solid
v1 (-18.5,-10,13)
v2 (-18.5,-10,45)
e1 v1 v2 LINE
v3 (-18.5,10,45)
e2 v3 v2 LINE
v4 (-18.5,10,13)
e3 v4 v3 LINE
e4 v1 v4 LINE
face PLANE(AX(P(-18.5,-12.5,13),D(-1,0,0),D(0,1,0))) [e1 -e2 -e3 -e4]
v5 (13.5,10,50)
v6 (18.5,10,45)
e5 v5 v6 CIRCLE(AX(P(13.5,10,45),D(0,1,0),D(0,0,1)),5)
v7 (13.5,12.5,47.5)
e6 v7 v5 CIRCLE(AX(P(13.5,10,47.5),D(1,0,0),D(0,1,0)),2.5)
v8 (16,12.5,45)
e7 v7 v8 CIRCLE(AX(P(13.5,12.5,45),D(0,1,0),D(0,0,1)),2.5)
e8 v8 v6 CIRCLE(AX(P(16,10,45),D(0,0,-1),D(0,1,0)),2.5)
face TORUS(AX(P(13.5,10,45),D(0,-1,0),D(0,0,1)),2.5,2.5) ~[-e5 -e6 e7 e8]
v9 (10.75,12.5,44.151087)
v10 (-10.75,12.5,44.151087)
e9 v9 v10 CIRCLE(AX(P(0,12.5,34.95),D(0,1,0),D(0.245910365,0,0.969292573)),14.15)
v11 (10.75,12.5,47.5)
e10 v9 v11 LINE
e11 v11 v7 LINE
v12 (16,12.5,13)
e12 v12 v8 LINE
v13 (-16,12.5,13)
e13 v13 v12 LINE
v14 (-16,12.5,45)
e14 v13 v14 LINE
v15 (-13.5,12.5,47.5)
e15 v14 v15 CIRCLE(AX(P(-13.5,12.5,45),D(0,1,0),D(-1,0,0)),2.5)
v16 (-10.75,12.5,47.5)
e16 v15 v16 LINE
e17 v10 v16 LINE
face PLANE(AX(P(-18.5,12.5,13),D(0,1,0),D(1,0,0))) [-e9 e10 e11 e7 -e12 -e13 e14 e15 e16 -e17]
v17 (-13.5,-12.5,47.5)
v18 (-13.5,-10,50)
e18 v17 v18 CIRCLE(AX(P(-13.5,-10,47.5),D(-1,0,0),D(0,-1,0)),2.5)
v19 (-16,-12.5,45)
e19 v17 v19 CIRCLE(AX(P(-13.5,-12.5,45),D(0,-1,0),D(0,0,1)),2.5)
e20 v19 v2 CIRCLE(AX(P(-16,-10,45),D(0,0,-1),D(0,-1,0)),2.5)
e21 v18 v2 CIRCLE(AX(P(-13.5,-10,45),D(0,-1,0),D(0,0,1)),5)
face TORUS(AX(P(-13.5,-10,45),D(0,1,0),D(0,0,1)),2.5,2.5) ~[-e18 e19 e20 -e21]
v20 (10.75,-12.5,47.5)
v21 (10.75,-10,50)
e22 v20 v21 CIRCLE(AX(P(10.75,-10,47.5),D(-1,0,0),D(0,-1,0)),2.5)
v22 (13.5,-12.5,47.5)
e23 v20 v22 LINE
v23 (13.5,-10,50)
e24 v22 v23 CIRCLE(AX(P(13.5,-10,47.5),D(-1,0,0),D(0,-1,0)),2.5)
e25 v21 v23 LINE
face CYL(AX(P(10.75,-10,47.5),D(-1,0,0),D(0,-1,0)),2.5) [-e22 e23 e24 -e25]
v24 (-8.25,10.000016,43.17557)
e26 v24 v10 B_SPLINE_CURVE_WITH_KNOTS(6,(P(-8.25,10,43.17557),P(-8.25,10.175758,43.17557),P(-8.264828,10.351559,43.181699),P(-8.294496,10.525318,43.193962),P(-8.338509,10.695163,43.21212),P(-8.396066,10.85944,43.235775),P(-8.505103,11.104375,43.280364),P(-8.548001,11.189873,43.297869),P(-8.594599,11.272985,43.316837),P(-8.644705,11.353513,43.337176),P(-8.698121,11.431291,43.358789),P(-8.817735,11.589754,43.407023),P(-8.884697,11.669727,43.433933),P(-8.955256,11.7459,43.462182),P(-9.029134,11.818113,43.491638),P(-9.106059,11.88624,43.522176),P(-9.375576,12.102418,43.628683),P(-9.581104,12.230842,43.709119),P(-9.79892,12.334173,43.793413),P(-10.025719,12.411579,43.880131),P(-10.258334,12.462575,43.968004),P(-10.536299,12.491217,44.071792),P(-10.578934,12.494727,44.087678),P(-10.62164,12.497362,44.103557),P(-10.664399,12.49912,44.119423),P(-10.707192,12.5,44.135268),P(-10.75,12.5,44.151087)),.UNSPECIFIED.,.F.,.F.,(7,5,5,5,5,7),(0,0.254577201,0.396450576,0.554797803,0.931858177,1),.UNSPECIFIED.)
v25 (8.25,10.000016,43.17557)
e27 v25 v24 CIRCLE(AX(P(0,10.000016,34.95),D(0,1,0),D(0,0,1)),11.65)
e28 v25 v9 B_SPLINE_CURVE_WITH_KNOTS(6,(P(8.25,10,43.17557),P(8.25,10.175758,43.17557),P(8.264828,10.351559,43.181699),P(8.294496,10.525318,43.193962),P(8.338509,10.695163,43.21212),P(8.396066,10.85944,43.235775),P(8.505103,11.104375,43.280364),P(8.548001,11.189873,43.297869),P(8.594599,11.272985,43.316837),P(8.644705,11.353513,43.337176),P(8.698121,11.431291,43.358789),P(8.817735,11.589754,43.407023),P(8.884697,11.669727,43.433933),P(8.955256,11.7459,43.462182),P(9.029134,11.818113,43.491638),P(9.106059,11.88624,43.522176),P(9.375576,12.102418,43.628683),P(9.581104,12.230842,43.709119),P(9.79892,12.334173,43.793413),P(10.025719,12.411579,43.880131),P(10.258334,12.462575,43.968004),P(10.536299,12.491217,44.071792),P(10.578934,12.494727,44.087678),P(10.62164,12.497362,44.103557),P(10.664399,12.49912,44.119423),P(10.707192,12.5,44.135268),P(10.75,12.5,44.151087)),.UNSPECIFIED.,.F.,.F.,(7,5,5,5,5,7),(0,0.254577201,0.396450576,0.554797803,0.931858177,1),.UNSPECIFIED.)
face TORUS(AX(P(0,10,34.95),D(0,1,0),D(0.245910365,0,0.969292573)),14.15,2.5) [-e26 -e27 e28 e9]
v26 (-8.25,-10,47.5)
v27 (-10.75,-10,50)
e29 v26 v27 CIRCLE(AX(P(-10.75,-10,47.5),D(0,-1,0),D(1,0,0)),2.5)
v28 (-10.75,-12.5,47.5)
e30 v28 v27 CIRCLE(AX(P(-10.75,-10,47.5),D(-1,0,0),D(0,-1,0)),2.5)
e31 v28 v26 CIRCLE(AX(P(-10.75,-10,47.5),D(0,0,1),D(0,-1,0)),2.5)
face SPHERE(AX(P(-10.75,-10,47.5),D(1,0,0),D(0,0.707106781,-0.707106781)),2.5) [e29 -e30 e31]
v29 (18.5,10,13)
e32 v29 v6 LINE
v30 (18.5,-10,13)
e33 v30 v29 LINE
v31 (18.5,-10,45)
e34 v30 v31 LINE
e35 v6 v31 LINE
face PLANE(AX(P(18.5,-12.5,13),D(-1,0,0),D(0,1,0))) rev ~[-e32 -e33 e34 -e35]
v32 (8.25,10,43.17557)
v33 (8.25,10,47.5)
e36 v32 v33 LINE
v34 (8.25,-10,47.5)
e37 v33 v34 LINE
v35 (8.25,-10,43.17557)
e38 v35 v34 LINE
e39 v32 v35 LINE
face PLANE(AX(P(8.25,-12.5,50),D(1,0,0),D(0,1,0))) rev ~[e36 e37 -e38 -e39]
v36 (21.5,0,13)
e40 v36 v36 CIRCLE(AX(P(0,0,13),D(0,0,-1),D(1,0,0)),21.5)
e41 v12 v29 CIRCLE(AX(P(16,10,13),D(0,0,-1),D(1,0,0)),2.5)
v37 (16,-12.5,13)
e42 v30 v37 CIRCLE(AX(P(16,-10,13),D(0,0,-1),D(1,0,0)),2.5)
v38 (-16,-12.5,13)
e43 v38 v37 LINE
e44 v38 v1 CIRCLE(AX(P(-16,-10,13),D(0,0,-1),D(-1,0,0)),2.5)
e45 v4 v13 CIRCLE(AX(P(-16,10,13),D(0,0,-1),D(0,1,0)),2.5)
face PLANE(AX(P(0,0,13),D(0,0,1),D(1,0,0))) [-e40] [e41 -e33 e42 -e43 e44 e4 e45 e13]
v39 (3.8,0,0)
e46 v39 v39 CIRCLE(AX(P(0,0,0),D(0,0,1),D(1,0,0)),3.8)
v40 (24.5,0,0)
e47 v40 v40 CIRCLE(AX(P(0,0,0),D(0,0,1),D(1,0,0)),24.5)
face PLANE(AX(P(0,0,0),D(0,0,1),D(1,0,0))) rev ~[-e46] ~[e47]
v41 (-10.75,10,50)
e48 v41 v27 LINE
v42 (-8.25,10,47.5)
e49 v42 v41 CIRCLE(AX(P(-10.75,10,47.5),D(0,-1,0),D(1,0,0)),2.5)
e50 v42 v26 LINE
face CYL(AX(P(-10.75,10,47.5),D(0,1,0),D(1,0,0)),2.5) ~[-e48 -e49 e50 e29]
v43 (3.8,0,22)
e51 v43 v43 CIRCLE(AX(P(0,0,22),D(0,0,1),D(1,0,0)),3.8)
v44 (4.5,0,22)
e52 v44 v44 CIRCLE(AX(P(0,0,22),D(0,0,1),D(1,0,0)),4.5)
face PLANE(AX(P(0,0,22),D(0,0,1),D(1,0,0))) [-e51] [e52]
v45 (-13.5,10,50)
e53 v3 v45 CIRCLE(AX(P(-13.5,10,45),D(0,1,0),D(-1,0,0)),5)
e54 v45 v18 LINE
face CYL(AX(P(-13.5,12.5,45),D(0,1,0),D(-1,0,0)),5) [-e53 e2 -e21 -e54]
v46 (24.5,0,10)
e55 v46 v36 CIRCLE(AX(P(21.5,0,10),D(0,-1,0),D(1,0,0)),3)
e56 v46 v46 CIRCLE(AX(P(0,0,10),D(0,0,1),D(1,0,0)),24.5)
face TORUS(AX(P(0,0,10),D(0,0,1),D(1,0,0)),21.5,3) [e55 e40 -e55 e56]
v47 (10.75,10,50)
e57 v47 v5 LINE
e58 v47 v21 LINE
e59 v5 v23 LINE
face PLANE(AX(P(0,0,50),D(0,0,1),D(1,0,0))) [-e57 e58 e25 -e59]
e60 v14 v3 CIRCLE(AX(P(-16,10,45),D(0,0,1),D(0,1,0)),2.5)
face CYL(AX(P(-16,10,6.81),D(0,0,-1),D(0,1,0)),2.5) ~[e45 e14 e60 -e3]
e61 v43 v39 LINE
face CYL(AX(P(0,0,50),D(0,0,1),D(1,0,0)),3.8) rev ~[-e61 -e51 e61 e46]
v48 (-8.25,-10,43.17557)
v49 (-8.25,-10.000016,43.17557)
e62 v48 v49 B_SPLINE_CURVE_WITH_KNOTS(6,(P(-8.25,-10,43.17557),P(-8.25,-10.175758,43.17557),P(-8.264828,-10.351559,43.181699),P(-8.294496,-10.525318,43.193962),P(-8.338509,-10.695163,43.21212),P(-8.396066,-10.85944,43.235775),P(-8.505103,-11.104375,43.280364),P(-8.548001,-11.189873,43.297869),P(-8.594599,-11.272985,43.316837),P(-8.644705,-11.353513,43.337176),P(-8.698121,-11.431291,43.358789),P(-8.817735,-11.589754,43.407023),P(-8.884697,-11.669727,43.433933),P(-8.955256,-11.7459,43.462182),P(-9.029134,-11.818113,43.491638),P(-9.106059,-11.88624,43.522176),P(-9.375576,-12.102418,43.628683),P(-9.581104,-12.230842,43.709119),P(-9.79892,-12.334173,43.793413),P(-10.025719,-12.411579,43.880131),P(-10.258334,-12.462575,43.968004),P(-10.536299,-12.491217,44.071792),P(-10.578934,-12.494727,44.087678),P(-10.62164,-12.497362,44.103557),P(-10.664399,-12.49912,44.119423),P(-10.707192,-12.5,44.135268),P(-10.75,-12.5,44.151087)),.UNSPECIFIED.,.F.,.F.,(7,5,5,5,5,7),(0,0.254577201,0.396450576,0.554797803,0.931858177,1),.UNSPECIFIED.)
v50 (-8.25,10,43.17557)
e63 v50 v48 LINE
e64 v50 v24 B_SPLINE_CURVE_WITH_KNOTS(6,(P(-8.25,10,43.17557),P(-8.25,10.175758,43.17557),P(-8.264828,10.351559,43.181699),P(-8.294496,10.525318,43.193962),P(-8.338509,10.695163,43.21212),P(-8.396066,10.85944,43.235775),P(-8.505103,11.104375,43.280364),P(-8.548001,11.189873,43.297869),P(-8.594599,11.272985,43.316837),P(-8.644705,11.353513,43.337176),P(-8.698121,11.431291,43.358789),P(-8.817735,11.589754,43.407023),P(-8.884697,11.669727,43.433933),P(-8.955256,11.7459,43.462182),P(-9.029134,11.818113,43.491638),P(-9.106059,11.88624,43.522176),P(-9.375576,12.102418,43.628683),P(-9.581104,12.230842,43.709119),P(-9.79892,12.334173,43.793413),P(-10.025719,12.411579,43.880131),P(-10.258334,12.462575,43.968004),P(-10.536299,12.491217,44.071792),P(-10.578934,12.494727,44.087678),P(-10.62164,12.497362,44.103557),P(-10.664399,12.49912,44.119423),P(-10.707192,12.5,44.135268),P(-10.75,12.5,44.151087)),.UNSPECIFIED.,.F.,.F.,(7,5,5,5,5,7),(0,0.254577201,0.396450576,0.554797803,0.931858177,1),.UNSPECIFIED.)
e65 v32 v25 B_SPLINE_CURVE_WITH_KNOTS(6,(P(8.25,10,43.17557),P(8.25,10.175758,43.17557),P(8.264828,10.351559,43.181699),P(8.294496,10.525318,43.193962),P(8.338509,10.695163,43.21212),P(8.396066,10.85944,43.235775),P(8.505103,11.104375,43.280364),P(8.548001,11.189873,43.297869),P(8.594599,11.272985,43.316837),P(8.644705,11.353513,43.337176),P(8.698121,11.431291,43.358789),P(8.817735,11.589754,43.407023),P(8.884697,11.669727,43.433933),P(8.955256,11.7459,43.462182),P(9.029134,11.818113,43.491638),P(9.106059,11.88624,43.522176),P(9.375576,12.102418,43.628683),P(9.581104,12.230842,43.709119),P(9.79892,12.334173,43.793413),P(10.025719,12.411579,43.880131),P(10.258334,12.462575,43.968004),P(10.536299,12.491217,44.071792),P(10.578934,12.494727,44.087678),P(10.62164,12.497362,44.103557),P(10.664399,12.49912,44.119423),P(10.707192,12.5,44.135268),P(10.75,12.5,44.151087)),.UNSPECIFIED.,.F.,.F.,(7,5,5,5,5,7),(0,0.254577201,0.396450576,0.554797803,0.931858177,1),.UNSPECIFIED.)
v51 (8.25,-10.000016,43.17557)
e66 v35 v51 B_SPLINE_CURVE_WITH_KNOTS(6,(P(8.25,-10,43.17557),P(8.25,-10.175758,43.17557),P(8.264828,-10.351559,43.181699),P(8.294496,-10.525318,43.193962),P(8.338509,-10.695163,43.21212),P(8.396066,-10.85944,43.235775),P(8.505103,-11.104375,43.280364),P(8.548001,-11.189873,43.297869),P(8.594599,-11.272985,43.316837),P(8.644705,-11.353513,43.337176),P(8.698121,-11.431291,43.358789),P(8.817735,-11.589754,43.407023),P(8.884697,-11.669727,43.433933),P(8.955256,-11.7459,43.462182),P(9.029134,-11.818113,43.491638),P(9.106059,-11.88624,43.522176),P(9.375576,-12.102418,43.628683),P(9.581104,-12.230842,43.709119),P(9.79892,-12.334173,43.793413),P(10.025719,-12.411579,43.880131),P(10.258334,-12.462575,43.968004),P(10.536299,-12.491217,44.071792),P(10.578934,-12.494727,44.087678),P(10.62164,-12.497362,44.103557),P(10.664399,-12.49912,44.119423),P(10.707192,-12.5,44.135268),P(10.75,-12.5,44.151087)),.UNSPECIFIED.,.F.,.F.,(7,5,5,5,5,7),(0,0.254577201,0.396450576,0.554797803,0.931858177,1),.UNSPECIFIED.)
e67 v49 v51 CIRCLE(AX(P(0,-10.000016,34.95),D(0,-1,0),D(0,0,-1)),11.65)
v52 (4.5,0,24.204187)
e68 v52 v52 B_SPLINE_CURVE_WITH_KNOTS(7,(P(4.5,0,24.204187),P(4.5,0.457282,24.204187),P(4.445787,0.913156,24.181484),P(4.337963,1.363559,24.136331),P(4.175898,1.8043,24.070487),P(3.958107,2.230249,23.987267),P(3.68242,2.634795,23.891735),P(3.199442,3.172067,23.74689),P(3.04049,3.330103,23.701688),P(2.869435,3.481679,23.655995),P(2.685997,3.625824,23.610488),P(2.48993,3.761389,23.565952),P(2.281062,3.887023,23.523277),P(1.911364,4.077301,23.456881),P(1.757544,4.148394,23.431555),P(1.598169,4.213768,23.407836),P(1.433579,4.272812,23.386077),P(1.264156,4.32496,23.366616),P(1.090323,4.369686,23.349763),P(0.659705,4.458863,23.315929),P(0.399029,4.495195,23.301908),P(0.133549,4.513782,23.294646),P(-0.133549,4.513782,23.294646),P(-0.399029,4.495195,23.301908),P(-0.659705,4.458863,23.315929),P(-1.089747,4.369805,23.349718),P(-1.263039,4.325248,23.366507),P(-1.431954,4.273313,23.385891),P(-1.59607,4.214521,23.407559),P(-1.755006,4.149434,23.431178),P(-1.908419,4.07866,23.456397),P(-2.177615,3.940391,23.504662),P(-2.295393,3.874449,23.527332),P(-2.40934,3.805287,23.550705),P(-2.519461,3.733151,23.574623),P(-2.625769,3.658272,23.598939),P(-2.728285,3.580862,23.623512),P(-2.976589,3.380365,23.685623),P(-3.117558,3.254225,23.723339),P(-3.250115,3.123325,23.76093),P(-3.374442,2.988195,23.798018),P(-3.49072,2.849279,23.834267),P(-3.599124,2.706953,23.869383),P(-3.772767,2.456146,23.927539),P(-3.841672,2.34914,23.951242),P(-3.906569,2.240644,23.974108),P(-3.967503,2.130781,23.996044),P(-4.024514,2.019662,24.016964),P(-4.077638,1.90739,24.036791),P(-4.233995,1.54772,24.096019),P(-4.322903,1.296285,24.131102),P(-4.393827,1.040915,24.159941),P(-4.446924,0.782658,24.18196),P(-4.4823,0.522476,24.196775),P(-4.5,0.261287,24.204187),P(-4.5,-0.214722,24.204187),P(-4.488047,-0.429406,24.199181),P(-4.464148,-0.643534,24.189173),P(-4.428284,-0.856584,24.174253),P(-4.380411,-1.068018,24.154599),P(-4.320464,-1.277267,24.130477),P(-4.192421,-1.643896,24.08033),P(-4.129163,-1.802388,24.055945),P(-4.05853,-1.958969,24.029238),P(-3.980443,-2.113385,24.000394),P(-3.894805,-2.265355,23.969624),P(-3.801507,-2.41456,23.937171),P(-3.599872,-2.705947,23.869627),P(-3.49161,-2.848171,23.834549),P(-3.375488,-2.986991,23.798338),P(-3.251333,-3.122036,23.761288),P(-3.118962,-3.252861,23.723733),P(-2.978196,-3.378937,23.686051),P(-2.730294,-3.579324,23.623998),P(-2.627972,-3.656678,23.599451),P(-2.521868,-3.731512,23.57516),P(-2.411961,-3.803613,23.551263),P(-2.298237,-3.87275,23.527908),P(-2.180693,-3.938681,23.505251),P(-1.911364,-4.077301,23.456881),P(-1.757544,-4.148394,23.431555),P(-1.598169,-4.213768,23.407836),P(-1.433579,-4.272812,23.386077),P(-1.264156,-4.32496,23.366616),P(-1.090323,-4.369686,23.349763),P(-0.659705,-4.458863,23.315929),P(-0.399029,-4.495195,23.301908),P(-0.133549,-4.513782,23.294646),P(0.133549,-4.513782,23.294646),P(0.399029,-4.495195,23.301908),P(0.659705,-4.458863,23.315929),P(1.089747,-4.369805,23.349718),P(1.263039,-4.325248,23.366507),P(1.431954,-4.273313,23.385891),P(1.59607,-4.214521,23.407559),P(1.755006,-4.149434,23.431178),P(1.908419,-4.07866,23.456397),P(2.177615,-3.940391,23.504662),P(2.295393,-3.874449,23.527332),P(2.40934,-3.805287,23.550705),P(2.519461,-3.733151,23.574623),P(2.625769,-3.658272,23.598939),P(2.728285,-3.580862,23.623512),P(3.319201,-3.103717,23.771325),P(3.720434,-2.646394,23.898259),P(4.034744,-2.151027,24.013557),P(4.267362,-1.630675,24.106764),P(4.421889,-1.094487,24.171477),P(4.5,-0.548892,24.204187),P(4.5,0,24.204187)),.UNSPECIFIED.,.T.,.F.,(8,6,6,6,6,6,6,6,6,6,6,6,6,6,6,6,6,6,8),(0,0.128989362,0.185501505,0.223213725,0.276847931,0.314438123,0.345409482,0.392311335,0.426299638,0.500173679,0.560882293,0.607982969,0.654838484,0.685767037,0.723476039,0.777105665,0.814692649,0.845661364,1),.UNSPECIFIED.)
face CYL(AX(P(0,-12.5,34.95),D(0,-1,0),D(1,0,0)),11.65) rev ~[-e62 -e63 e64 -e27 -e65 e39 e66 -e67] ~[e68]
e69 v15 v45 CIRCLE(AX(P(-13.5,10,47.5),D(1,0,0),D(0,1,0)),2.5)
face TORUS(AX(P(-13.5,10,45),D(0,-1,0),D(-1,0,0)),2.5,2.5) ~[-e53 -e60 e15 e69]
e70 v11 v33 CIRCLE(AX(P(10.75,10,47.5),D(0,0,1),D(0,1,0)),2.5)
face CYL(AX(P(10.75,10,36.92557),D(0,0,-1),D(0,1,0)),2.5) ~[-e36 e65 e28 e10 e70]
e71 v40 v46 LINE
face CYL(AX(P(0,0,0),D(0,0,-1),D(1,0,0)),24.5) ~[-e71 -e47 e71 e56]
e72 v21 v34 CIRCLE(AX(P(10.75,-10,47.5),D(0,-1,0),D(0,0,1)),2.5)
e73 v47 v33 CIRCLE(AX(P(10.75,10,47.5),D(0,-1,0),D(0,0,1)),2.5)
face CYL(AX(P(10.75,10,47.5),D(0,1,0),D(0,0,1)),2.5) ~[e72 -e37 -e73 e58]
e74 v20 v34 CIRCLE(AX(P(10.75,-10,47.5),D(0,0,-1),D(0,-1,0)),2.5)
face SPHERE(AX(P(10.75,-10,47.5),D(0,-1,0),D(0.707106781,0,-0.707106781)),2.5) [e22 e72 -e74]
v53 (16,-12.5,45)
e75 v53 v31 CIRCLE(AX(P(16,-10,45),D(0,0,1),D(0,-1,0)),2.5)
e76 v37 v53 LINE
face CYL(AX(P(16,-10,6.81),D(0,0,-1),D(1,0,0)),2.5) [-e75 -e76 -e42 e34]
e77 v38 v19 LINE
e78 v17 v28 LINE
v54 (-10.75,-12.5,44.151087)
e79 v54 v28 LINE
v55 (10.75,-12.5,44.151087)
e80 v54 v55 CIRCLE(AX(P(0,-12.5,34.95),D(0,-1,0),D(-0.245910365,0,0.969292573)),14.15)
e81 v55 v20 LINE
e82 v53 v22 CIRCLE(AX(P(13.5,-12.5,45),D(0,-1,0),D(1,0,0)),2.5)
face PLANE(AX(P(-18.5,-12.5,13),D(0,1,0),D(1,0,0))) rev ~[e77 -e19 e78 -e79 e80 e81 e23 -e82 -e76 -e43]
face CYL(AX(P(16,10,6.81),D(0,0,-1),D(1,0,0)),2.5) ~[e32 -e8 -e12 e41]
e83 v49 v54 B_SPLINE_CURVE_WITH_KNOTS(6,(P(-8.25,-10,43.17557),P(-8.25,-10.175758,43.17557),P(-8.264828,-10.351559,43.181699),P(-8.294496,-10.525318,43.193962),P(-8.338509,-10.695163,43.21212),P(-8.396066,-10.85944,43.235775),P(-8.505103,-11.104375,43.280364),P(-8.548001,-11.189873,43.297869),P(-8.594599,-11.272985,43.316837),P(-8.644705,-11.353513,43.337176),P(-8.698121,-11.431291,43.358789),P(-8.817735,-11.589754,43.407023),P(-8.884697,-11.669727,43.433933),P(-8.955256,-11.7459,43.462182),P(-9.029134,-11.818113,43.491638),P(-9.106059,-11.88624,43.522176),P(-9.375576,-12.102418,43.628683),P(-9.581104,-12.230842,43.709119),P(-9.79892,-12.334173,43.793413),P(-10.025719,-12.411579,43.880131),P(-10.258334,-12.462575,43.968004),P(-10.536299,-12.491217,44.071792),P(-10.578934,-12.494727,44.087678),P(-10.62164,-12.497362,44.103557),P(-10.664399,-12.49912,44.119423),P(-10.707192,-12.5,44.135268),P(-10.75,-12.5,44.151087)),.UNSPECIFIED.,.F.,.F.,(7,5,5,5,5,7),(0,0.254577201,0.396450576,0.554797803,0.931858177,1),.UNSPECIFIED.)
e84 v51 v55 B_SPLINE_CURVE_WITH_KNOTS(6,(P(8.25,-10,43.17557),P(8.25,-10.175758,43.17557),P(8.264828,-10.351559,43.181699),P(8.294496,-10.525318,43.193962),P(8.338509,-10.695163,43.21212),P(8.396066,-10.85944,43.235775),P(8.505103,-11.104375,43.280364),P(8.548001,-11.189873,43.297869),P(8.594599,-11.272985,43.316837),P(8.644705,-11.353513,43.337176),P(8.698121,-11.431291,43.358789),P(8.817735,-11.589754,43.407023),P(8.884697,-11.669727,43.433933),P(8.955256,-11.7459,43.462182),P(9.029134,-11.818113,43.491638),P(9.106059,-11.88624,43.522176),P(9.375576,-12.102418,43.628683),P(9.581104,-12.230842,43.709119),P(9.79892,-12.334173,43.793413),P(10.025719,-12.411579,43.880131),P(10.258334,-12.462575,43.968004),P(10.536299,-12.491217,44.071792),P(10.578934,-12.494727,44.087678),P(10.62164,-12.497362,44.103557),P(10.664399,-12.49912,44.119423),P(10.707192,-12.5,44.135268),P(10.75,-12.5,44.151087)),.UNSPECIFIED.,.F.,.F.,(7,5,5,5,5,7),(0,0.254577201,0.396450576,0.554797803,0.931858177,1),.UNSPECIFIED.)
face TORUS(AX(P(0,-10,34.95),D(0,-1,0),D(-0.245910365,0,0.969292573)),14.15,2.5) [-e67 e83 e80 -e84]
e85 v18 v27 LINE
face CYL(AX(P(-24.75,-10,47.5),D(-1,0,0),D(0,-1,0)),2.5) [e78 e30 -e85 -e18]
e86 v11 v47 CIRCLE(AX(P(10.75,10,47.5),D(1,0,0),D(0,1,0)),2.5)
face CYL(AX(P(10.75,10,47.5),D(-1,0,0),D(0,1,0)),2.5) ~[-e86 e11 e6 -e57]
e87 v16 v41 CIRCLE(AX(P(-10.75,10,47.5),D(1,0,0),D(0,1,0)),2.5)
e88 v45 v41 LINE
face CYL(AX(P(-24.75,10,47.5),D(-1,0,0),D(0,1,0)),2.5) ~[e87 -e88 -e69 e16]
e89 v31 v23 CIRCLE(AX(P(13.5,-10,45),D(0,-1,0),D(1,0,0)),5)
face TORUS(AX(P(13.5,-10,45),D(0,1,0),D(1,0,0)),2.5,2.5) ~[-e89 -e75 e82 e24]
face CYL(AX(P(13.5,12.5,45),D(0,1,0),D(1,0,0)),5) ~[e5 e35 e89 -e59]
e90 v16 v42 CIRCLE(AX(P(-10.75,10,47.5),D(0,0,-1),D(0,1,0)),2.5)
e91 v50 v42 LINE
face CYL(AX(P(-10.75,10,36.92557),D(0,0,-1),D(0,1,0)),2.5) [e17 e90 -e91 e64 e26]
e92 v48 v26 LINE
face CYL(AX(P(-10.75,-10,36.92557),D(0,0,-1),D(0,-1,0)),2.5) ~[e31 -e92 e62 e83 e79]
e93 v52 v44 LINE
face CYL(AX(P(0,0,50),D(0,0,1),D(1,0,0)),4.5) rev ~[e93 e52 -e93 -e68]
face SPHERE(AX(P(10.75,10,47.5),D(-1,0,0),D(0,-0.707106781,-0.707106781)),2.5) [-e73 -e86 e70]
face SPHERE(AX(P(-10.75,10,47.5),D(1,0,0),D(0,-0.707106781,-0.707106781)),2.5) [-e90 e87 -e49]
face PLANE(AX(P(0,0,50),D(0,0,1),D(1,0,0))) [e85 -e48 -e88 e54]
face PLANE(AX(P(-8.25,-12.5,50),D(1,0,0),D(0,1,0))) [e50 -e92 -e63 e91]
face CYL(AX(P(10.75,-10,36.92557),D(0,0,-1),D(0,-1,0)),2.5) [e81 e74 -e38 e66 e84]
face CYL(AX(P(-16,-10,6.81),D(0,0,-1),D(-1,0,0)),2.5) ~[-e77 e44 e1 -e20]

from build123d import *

# Parameters (mm, degrees)
F0_R          = 24.5
F1_DEPTH      = 13
F2_W          = 37
F2_H          = 25
F3_DEPTH      = 37
F5_R          = 3.8
F6_DEPTH      = 60
F7_R          = 11.65
F8_DEPTH      = 40
F9_W          = 16.5
F9_H          = 25
F10_DEPTH     = 10
F11_R         = 4.5
F12_DEPTH     = 28
F13_T1_DEPTH  = 14
F13_T3_DEPTH  = 14
F13_T5_DEPTH  = 10.5744301109
F13_T7_DEPTH  = 20
F13_S11_W     = 2.5
F13_S11_H     = 2.5
F13_T12_DEPTH = 2.5
F13_S17_W     = 2.5
F13_S17_H     = 2.5
F13_T18_DEPTH = 2.5
F13_S23_W     = 2.5
F13_S23_H     = 2.5
F13_T24_DEPTH = 2.5
F13_S29_W     = 2.5
F13_S29_H     = 2.5
F13_T30_DEPTH = 2.5
F13_T36_DEPTH = 49.44
F13_T41_DEPTH = 49.44
F13_T46_DEPTH = 49.44
F13_T51_DEPTH = 49.44
F13_T54_ANGLE = 331.528720339
F13_T56_ANGLE = 331.528720339
F14_T1_DEPTH  = 24.9999999998
F14_T4_ANGLE  = 90
F14_T6_ANGLE  = 90
F14_T8_ANGLE  = 90
F14_T10_ANGLE = 90


# Not quite as in the source:
# - a fillet or chamfer that OpenCascade refuses, or shapes differently, is made with other operations: its cross-section is extruded or revolved along the edge and cut away or added


with BuildPart() as f1:
    # F0 (on Top) → F1 (new body)
    with BuildSketch(Plane.XY):
        Circle(F0_R)
    extrude(amount=F1_DEPTH)

    # F2 (on face) → F3 (join)
    with BuildSketch(Plane.XY.offset(13)):
        Rectangle(F2_W, F2_H)
    extrude(amount=F3_DEPTH)

    # F4: fillet of radius 3 on 1 edges, made by hand

    # F4_s1 → F4_t2 (revolve, cut)
    with BuildSketch(Plane.XZ):
        with BuildLine():
            ThreePointArc((24.5, 10), (23.6213203436, 12.1213203436), (21.5, 13))
            Line((21.5, 13), (21.5, 13.06))
            Line((21.5, 13.06), (24.56, 13.06))
            Line((24.56, 13.06), (24.56, 10))
            Line((24.56, 10), (24.5, 10))
        make_face()
    revolve(axis=Axis((0, 0, 13), (0, 0, 1)), mode=Mode.SUBTRACT)

    # F5 (on face) → F6 (cut)
    with BuildSketch(Plane.XY.offset(50)):
        Circle(F5_R)
    extrude(amount=-F6_DEPTH, mode=Mode.SUBTRACT)

    # F7 (on face) → F8 (cut)
    with BuildSketch(Plane.XZ.offset(12.5)):
        with Locations((0, 34.95)):
            Circle(F7_R)
    extrude(amount=-F8_DEPTH, mode=Mode.SUBTRACT)

    # F9 (on face) → F10 (cut)
    with BuildSketch(Plane.XY.offset(50)):
        Rectangle(F9_W, F9_H)
    extrude(amount=-F10_DEPTH, mode=Mode.SUBTRACT)

    # F11 (on face) → F12 (cut)
    with BuildSketch(Plane.XY.offset(50)):
        Circle(F11_R)
    extrude(amount=-F12_DEPTH, mode=Mode.SUBTRACT)

    # F13: fillet of radius 2.5 on 16 edges, made by hand

    # F13_s2 → F13_t1 (cut)
    with BuildSketch(Plane.YZ.offset(-24.75)):
        with BuildLine():
            ThreePointArc((-12.5, 47.5), (-11.767766953, 49.267766953), (-10, 50))
            Line((-10, 50), (-12.5, 50))
            Line((-12.5, 50), (-12.5, 47.5))
        make_face()
        with BuildLine():
            ThreePointArc((12.5, 47.5), (11.767766953, 49.267766953), (10, 50))
            Line((10, 50), (12.5, 50))
            Line((12.5, 50), (12.5, 47.5))
        make_face()
    extrude(amount=F13_T1_DEPTH, mode=Mode.SUBTRACT)

    # F13_s4 → F13_t3 (cut)
    with BuildSketch(Plane.YZ.offset(10.75)):
        with BuildLine():
            ThreePointArc((-12.5, 47.5), (-11.767766953, 49.267766953), (-10, 50))
            Line((-10, 50), (-12.5, 50))
            Line((-12.5, 50), (-12.5, 47.5))
        make_face()
        with BuildLine():
            ThreePointArc((12.5, 47.5), (11.767766953, 49.267766953), (10, 50))
            Line((10, 50), (12.5, 50))
            Line((12.5, 50), (12.5, 47.5))
        make_face()
    extrude(amount=F13_T3_DEPTH, mode=Mode.SUBTRACT)

    # F13_s6 → F13_t5 (cut)
    with BuildSketch(Plane.XY.offset(36.9255698891)):
        with BuildLine():
            ThreePointArc((-10.75, -12.5), (-8.982233047, -11.767766953), (-8.25, -10))
            Line((-8.25, -10), (-8.25, -12.5))
            Line((-8.25, -12.5), (-10.75, -12.5))
        make_face()
        with BuildLine():
            ThreePointArc((10.75, -12.5), (8.982233047, -11.767766953), (8.25, -10))
            Line((8.25, -10), (8.25, -12.5))
            Line((8.25, -12.5), (10.75, -12.5))
        make_face()
        with BuildLine():
            ThreePointArc((10.75, 12.5), (8.982233047, 11.767766953), (8.25, 10))
            Line((8.25, 10), (8.25, 12.5))
            Line((8.25, 12.5), (10.75, 12.5))
        make_face()
        with BuildLine():
            ThreePointArc((-10.75, 12.5), (-8.982233047, 11.767766953), (-8.25, 10))
            Line((-8.25, 10), (-8.25, 12.5))
            Line((-8.25, 12.5), (-10.75, 12.5))
        make_face()
    extrude(amount=F13_T5_DEPTH, mode=Mode.SUBTRACT)

    # F13_s8 → F13_t7 (cut)
    with BuildSketch(Plane.XZ.offset(-10)):
        with BuildLine():
            ThreePointArc((10.75, 50), (8.982233047, 49.267766953), (8.25, 47.5))
            Line((8.25, 47.5), (8.25, 50))
            Line((8.25, 50), (10.75, 50))
        make_face()
        with BuildLine():
            ThreePointArc((-8.25, 47.5), (-8.982233047, 49.267766953), (-10.75, 50))
            Line((-10.75, 50), (-8.25, 50))
            Line((-8.25, 50), (-8.25, 47.5))
        make_face()
    extrude(amount=F13_T7_DEPTH, mode=Mode.SUBTRACT)


with BuildPart() as f13_tool10:
    # F13_s11 → F13_t12 (new body)
    with BuildSketch(Plane.YZ.offset(-10.75)):
        with Locations((-11.25, 48.75)):
            Rectangle(F13_S11_W, F13_S11_H)
    extrude(amount=F13_T12_DEPTH)

    # F13_s13 → F13_t14 (revolve, cut)
    with BuildSketch(Plane(origin=(-10.75, -10, 47.5), x_dir=(0, 0.7071067812, -0.7071067812), z_dir=(0, -0.7071067812, -0.7071067812))):
        with BuildLine():
            ThreePointArc((0, -2.5), (2.5, 0), (0, 2.5))
            Line((0, 2.5), (0, -2.5))
        make_face()
    revolve(axis=Axis((-10.75, -10, 47.5), (1, 0, 0)), mode=Mode.SUBTRACT)


with BuildPart() as f1_1:
    add(f1.part)

    # F13_t9: cut F13_tool10
    add(f13_tool10.part, mode=Mode.SUBTRACT)


with BuildPart() as f13_tool16:
    # F13_s17 → F13_t18 (new body)
    with BuildSketch(Plane.XZ.offset(10)):
        with Locations((9.5, 48.75)):
            Rectangle(F13_S17_W, F13_S17_H)
    extrude(amount=F13_T18_DEPTH)

    # F13_s19 → F13_t20 (revolve, cut)
    with BuildSketch(Plane(origin=(10.75, -10, 47.5), x_dir=(0.7071067812, 0, -0.7071067812), z_dir=(-0.7071067812, 0, -0.7071067812))):
        with BuildLine():
            ThreePointArc((0, -2.5), (2.5, 0), (0, 2.5))
            Line((0, 2.5), (0, -2.5))
        make_face()
    revolve(axis=Axis((10.75, -10, 47.5), (0, -1, 0)), mode=Mode.SUBTRACT)


with BuildPart() as f1_2:
    add(f1_1.part)

    # F13_t15: cut F13_tool16
    add(f13_tool16.part, mode=Mode.SUBTRACT)


with BuildPart() as f13_tool22:
    # F13_s23 → F13_t24 (new body)
    with BuildSketch(Plane.YZ.offset(-10.75)):
        with Locations((11.25, 48.75)):
            Rectangle(F13_S23_W, F13_S23_H)
    extrude(amount=F13_T24_DEPTH)

    # F13_s25 → F13_t26 (revolve, cut)
    with BuildSketch(Plane(origin=(-10.75, 10, 47.5), x_dir=(0, -0.7071067812, -0.7071067812), z_dir=(0, -0.7071067812, 0.7071067812))):
        with BuildLine():
            ThreePointArc((0, -2.5), (2.5, 0), (0, 2.5))
            Line((0, 2.5), (0, -2.5))
        make_face()
    revolve(axis=Axis((-10.75, 10, 47.5), (1, 0, 0)), mode=Mode.SUBTRACT)


with BuildPart() as f1_3:
    add(f1_2.part)

    # F13_t21: cut F13_tool22
    add(f13_tool22.part, mode=Mode.SUBTRACT)


with BuildPart() as f13_tool28:
    # F13_s29 → F13_t30 (new body)
    with BuildSketch(Plane.YZ.offset(10.75)):
        with Locations((11.25, 48.75)):
            Rectangle(F13_S29_W, F13_S29_H)
    extrude(amount=-F13_T30_DEPTH)

    # F13_s31 → F13_t32 (revolve, cut)
    with BuildSketch(Plane(origin=(10.75, 10, 47.5), x_dir=(0, -0.7071067812, -0.7071067812), z_dir=(0, 0.7071067812, -0.7071067812))):
        with BuildLine():
            ThreePointArc((0, -2.5), (2.5, 0), (0, 2.5))
            Line((0, 2.5), (0, -2.5))
        make_face()
    revolve(axis=Axis((10.75, 10, 47.5), (-1, 0, 0)), mode=Mode.SUBTRACT)


with BuildPart() as f1_4:
    add(f1_3.part)

    # F13_t27: cut F13_tool28
    add(f13_tool28.part, mode=Mode.SUBTRACT)


with BuildPart() as f13_tool34:
    # F13_s35 → F13_t36 (new body)
    with BuildSketch(Plane.XY.offset(6.81)):
        with BuildLine():
            ThreePointArc((18.5, 10), (17.767766953, 11.767766953), (16, 12.5))
            Line((16, 12.5), (18.5, 12.5))
            Line((18.5, 12.5), (18.5, 10))
        make_face()
    extrude(amount=F13_T36_DEPTH)

    split(bisect_by=Plane.XY.offset(13), keep=Keep.TOP)


with BuildPart() as f1_5:
    add(f1_4.part)

    # F13_t33: cut F13_tool34
    add(f13_tool34.part, mode=Mode.SUBTRACT)


with BuildPart() as f13_tool39:
    # F13_s40 → F13_t41 (new body)
    with BuildSketch(Plane.XY.offset(6.81)):
        with BuildLine():
            ThreePointArc((-16, 12.5), (-17.767766953, 11.767766953), (-18.5, 10))
            Line((-18.5, 10), (-18.5, 12.5))
            Line((-18.5, 12.5), (-16, 12.5))
        make_face()
    extrude(amount=F13_T41_DEPTH)

    split(bisect_by=Plane.XY.offset(13), keep=Keep.TOP)


with BuildPart() as f1_6:
    add(f1_5.part)

    # F13_t38: cut F13_tool39
    add(f13_tool39.part, mode=Mode.SUBTRACT)


with BuildPart() as f13_tool44:
    # F13_s45 → F13_t46 (new body)
    with BuildSketch(Plane.XY.offset(6.81)):
        with BuildLine():
            ThreePointArc((18.5, -10), (17.767766953, -11.767766953), (16, -12.5))
            Line((16, -12.5), (18.5, -12.5))
            Line((18.5, -12.5), (18.5, -10))
        make_face()
    extrude(amount=F13_T46_DEPTH)

    split(bisect_by=Plane.XY.offset(13), keep=Keep.TOP)


with BuildPart() as f1_7:
    add(f1_6.part)

    # F13_t43: cut F13_tool44
    add(f13_tool44.part, mode=Mode.SUBTRACT)


with BuildPart() as f13_tool49:
    # F13_s50 → F13_t51 (new body)
    with BuildSketch(Plane.XY.offset(6.81)):
        with BuildLine():
            ThreePointArc((-18.5, -10), (-17.767766953, -11.767766953), (-16, -12.5))
            Line((-16, -12.5), (-18.5, -12.5))
            Line((-18.5, -12.5), (-18.5, -10))
        make_face()
    extrude(amount=F13_T51_DEPTH)

    split(bisect_by=Plane.XY.offset(13), keep=Keep.TOP)


with BuildPart() as f1_8:
    add(f1_7.part)

    # F13_t48: cut F13_tool49
    add(f13_tool49.part, mode=Mode.SUBTRACT)

    # F13_s53 → F13_t54 (revolve, cut)
    with BuildSketch(Plane(origin=(-8.3306502048, 0, 2.1134931675), x_dir=(0, 1, 0), z_dir=(-0.9692925732, 0, 0.2459103648))):
        with BuildLine():
            ThreePointArc((12.5, -48.0267754339), (11.767766953, -46.2590084809), (10, -45.5267754339))
            Line((10, -45.5267754339), (12.5, -45.5267754339))
            Line((12.5, -45.5267754339), (12.5, -48.0267754339))
        make_face()
    revolve(axis=Axis((0, 12.5, 34.95), (0, 1, 0)), revolution_arc=F13_T54_ANGLE, mode=Mode.SUBTRACT)

    # F13_s55 → F13_t56 (revolve, cut)
    with BuildSketch(Plane(origin=(8.3306502048, 0, 2.1134931675), x_dir=(0, 1, 0), z_dir=(0.9692925732, 0, 0.2459103648))):
        with BuildLine():
            ThreePointArc((-12.5, 48.0267754339), (-11.767766953, 46.2590084809), (-10, 45.5267754339))
            Line((-10, 45.5267754339), (-12.5, 45.5267754339))
            Line((-12.5, 45.5267754339), (-12.5, 48.0267754339))
        make_face()
    revolve(axis=Axis((0, -12.5, 34.95), (0, -1, 0)), revolution_arc=F13_T56_ANGLE, mode=Mode.SUBTRACT)

    # F14: fillet of radius 5 on 2 edges, made by hand

    # F14_s2 → F14_t1 (cut)
    with BuildSketch(Plane.XZ.offset(-12.4999999999)):
        with BuildLine():
            ThreePointArc((18.5, 45), (17.0355339059, 48.5355339059), (13.5, 50))
            Line((13.5, 50), (18.5, 50))
            Line((18.5, 50), (18.5, 45))
        make_face()
        with BuildLine():
            ThreePointArc((-18.5, 45), (-17.0355339059, 48.5355339059), (-13.5, 50))
            Line((-13.5, 50), (-18.5, 50))
            Line((-18.5, 50), (-18.5, 45))
        make_face()
    extrude(amount=F14_T1_DEPTH, mode=Mode.SUBTRACT)

    # F14_s3 → F14_t4 (revolve, cut)
    with BuildSketch(Plane.XY.offset(45)):
        with BuildLine():
            ThreePointArc((-16.0000000001, 12.5), (-17.767766953, 11.767766953), (-18.5, 10.0000000001))
            Line((-18.5, 10.0000000001), (-18.5, 12.5))
            Line((-18.5, 12.5), (-16.0000000001, 12.5))
        make_face()
    revolve(axis=Axis((-13.5, 12.5, 45), (0, 1, 0)), revolution_arc=F14_T4_ANGLE, mode=Mode.SUBTRACT)

    # F14_s5 → F14_t6 (revolve, cut)
    with BuildSketch(Plane.YZ.offset(-13.5)):
        with BuildLine():
            ThreePointArc((-12.5, 47.5000000001), (-11.767766953, 49.267766953), (-10.0000000001, 50))
            Line((-10.0000000001, 50), (-12.5, 50))
            Line((-12.5, 50), (-12.5, 47.5000000001))
        make_face()
    revolve(axis=Axis((-13.5, -12.5, 45), (0, -1, 0)), revolution_arc=F14_T6_ANGLE, mode=Mode.SUBTRACT)

    # F14_s7 → F14_t8 (revolve, cut)
    with BuildSketch(Plane.XY.offset(45)):
        with BuildLine():
            ThreePointArc((16.0000000001, -12.5), (17.767766953, -11.767766953), (18.5, -10.0000000001))
            Line((18.5, -10.0000000001), (18.5, -12.5))
            Line((18.5, -12.5), (16.0000000001, -12.5))
        make_face()
    revolve(axis=Axis((13.5, -12.5, 45), (0, -1, 0)), revolution_arc=F14_T8_ANGLE, mode=Mode.SUBTRACT)

    # F14_s9 → F14_t10 (revolve, cut)
    with BuildSketch(Plane.YZ.offset(13.5)):
        with BuildLine():
            ThreePointArc((12.5, 47.5000000001), (11.767766953, 49.267766953), (10.0000000001, 50))
            Line((10.0000000001, 50), (12.5, 50))
            Line((12.5, 50), (12.5, 47.5000000001))
        make_face()
    revolve(axis=Axis((13.5, 12.5, 45), (0, 1, 0)), revolution_arc=F14_T10_ANGLE, mode=Mode.SUBTRACT)


solid = f1_8.part
